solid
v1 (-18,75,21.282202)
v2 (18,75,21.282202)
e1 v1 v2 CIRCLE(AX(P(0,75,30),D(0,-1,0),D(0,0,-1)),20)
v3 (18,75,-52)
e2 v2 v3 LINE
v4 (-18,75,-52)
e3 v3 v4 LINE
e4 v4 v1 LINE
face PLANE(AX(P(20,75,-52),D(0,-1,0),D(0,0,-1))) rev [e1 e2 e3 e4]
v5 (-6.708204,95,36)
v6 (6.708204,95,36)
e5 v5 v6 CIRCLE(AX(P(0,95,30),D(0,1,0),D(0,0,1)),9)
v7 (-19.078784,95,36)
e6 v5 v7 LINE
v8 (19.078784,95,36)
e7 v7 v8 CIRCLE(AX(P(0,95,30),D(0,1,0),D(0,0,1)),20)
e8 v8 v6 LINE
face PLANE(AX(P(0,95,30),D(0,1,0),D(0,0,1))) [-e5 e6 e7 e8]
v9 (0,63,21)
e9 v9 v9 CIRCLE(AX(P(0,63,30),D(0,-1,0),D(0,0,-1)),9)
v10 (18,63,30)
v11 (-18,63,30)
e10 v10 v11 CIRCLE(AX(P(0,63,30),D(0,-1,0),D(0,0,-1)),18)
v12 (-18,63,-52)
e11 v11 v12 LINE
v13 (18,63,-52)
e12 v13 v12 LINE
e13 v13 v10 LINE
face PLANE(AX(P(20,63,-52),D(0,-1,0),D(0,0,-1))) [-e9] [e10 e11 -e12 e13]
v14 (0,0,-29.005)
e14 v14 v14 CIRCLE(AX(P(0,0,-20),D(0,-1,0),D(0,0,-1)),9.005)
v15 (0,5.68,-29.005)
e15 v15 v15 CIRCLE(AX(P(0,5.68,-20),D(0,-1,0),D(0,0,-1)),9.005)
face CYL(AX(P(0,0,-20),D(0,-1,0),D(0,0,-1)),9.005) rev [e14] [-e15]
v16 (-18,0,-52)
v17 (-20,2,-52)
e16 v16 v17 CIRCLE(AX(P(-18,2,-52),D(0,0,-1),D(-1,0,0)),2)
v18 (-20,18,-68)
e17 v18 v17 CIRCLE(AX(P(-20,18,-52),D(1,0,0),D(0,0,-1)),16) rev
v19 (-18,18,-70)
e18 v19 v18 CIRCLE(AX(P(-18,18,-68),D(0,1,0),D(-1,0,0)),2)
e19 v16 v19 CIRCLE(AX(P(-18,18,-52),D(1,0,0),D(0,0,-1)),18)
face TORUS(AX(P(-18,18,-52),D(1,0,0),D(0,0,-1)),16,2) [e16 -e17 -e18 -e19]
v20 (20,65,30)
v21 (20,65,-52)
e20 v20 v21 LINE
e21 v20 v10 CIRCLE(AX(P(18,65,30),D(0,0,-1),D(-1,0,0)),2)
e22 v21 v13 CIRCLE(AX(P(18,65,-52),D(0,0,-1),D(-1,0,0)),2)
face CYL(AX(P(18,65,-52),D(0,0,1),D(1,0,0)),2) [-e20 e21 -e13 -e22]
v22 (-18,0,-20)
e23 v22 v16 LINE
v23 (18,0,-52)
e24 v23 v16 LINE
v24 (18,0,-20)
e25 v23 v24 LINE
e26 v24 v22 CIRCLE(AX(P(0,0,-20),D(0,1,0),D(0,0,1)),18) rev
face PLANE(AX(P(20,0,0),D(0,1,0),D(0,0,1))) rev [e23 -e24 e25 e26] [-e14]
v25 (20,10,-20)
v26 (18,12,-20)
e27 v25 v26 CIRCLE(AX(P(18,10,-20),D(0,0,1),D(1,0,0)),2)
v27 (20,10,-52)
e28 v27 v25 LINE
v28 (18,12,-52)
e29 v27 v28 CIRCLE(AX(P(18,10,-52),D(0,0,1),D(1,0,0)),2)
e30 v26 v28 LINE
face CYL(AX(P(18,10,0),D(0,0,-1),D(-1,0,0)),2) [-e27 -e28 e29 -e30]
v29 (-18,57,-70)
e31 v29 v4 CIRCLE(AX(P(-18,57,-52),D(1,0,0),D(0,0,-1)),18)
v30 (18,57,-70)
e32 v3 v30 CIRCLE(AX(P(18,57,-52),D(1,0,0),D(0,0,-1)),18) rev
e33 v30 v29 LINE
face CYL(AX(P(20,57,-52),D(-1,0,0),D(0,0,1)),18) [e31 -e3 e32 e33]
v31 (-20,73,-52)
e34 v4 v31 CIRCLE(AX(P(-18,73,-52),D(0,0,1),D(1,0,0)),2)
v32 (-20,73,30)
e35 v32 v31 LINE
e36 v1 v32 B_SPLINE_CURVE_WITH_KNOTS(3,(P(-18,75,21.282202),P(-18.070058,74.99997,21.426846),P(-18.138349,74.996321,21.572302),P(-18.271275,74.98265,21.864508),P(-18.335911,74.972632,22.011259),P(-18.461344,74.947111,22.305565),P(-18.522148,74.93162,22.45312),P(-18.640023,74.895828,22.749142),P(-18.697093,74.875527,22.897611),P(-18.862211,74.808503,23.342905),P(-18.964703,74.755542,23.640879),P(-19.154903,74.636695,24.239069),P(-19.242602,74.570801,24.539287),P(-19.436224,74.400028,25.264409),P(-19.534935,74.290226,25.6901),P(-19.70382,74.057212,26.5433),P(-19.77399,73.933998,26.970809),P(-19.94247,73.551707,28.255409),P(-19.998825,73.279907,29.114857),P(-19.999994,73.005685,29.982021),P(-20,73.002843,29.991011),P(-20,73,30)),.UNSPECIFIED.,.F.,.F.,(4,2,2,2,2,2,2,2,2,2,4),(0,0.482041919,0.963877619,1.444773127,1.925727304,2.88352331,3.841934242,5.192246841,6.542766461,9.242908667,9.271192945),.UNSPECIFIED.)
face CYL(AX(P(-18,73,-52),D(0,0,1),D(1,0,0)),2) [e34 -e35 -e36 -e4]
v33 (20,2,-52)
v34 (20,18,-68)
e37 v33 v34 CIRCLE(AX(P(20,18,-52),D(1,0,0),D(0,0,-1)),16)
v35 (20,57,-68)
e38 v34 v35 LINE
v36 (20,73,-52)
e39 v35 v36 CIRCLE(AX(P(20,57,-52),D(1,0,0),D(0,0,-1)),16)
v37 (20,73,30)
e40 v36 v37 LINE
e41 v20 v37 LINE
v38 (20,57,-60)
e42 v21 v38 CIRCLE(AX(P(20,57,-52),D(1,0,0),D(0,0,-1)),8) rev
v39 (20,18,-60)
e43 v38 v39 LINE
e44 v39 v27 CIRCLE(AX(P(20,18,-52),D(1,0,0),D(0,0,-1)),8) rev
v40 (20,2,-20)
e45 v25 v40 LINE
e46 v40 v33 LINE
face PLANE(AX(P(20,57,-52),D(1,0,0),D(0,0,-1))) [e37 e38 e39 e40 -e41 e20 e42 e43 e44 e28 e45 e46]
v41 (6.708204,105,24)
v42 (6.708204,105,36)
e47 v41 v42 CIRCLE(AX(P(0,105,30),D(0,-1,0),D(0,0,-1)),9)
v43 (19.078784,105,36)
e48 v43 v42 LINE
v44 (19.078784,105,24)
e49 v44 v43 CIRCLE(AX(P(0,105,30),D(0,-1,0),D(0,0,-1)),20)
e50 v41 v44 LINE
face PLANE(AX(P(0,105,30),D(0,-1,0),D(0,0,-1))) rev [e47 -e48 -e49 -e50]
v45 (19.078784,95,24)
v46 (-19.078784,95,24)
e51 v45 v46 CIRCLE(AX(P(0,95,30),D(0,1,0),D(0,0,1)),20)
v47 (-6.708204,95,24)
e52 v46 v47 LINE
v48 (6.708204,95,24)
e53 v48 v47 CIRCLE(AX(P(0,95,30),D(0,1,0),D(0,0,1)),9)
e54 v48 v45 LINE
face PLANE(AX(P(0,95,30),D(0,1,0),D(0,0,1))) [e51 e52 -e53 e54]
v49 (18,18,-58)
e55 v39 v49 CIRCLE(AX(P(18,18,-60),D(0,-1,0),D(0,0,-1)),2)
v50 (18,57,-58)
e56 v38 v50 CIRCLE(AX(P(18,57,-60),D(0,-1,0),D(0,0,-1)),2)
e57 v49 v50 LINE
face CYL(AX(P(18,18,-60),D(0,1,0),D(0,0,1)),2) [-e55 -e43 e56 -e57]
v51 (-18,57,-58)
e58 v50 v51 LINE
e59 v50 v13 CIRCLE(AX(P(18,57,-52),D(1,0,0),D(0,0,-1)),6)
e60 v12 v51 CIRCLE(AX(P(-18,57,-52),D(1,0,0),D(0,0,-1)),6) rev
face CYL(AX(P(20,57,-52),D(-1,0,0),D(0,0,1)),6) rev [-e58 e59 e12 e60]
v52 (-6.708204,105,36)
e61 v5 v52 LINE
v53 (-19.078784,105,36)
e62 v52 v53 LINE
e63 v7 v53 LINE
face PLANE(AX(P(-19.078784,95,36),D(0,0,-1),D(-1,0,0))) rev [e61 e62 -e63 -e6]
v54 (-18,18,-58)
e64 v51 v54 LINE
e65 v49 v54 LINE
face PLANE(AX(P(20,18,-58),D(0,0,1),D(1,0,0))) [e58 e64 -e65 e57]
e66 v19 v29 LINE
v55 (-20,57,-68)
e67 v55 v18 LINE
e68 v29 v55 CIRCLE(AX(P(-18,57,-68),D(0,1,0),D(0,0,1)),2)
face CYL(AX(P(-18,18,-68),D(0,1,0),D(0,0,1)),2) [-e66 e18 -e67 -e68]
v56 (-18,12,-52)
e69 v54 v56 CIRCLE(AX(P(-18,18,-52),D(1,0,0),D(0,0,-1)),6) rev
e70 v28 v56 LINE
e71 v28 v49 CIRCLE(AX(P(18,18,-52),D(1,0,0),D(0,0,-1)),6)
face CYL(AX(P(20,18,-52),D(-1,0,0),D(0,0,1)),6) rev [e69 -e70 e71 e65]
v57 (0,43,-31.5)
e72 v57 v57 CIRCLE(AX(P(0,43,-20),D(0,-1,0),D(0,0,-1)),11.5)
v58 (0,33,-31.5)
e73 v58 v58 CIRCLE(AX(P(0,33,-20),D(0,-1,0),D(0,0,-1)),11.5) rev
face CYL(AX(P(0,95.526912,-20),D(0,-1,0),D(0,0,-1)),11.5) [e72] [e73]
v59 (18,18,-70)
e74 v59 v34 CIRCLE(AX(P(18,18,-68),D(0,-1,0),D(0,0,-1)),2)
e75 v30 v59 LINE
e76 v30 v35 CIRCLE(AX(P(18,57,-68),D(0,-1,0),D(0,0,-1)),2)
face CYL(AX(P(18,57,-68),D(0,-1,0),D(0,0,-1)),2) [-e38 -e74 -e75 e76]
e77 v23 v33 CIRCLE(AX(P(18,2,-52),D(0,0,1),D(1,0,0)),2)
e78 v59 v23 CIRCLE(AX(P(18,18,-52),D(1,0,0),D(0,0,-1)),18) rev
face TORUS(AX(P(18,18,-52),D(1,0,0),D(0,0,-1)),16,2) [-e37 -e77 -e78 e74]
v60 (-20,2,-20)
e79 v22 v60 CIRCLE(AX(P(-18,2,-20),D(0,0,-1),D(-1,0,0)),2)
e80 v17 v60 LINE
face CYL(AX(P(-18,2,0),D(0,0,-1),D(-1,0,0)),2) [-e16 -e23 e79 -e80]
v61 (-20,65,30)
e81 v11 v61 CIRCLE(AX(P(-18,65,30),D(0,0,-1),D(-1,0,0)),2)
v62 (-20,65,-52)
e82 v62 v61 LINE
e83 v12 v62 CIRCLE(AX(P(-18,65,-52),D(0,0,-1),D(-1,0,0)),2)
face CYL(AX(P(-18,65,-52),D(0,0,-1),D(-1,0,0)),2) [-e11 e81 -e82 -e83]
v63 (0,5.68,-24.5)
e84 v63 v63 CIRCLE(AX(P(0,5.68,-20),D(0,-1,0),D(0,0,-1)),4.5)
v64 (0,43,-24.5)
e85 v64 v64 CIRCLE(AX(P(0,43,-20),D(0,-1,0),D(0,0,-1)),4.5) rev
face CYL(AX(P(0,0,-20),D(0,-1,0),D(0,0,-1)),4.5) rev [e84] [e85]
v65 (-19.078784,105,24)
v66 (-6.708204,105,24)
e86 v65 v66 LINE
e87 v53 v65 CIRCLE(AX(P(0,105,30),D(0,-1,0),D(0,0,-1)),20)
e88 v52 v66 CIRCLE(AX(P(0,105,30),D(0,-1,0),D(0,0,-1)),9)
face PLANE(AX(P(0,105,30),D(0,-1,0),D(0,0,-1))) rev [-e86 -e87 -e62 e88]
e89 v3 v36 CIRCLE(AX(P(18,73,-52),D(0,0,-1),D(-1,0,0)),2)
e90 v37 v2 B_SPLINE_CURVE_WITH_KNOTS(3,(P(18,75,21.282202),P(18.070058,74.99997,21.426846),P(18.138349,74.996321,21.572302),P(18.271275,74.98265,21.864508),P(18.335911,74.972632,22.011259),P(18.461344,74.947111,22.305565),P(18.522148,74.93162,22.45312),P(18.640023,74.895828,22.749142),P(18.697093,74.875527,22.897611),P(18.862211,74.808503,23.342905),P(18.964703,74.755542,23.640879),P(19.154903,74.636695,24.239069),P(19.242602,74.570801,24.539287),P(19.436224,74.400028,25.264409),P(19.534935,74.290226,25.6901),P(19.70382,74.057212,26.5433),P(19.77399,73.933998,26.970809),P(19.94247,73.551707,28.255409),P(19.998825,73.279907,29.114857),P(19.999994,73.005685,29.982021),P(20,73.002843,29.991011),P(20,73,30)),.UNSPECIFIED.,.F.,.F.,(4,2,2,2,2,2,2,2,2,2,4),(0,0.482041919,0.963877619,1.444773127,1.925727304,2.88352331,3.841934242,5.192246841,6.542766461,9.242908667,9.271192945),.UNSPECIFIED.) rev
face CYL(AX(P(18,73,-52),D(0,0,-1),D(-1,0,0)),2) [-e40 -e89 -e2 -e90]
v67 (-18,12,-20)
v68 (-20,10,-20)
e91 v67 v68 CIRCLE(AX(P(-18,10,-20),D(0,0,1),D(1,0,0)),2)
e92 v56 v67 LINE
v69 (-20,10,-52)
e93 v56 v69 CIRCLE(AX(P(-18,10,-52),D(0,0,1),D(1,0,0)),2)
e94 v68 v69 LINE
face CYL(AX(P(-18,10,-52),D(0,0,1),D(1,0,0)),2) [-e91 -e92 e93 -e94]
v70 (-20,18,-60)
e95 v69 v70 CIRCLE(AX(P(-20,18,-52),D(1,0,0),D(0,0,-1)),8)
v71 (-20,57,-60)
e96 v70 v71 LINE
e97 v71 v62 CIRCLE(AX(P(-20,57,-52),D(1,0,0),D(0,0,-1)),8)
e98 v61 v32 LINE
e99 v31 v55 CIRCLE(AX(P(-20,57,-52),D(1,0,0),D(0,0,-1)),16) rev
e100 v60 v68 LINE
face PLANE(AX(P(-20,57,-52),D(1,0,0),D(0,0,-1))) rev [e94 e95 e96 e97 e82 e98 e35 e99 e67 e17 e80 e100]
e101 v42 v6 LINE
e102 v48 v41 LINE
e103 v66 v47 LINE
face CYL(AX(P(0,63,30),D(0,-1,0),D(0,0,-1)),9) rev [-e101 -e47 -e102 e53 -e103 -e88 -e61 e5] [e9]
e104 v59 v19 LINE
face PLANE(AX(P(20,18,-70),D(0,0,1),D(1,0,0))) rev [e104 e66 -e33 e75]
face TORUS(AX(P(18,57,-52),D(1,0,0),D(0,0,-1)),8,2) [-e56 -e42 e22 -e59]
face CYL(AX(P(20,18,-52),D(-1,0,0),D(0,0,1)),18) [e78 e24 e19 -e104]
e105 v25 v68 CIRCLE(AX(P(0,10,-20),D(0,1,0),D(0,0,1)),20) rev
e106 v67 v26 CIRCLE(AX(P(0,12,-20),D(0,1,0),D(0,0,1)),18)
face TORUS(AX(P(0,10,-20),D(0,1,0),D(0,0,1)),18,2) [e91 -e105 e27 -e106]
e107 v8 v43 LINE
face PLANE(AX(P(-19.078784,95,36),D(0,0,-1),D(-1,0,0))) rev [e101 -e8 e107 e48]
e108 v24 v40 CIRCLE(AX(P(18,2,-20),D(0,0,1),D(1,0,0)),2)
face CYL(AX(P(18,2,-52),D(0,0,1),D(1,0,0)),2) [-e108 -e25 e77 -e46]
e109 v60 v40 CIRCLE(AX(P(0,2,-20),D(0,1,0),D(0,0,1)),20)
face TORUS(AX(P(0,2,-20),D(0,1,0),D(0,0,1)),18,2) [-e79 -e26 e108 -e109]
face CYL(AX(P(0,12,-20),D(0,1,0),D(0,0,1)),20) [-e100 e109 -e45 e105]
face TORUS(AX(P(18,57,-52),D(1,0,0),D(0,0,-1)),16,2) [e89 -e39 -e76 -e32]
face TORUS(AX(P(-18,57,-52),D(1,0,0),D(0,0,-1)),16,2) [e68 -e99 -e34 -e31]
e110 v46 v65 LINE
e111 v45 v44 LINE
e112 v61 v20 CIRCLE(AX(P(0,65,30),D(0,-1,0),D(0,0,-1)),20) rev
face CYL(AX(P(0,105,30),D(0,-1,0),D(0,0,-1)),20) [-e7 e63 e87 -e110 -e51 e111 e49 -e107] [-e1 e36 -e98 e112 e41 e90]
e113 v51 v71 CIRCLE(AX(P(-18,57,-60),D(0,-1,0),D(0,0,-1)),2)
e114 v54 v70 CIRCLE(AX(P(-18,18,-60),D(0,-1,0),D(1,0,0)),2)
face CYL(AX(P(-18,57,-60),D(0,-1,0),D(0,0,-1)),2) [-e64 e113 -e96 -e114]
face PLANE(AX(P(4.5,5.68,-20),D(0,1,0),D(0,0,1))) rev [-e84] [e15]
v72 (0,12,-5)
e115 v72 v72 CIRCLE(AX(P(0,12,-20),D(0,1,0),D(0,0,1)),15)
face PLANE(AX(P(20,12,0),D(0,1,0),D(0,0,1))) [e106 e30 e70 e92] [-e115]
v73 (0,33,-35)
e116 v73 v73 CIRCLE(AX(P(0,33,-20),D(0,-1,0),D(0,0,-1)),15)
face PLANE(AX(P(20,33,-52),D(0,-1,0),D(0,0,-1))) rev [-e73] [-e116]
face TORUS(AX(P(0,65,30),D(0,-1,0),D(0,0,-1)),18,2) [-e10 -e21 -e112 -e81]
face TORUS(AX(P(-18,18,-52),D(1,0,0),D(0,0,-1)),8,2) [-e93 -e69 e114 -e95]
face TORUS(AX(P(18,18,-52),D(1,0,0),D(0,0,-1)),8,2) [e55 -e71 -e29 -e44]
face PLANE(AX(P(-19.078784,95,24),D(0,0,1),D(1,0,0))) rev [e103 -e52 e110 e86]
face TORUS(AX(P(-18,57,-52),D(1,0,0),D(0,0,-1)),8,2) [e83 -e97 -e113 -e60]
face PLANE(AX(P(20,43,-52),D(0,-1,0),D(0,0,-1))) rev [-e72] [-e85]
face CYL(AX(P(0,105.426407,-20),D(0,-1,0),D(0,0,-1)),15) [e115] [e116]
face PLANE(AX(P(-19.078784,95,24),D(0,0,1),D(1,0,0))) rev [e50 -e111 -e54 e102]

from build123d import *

# Parameters (mm, degrees)
EXTRUDE_THIN1_DEPTH                       = 20
SKETCH2_R                                 = 20
BOSS_EXTRUDE1_DEPTH                       = 42
FILLET1_RADIUS                            = 20
FILLET1_LENGTH                            = 12
SKETCH3_R                                 = 15
BOSS_EXTRUDE2_DEPTH                       = 21
SKETCH4_R                                 = 11.5
BOSS_EXTRUDE3_DEPTH                       = 10
CUT_EXTRUDE1_START                        = -10
CUT_EXTRUDE1_DEPTH                        = 10
F_18_0_18_DIAMETER_HOLE1_D                = 18
CBORE_FOR_M8_HEX_HEAD_BOLT1_OUTLINE_R     = 4.5
CBORE_FOR_M8_HEX_HEAD_BOLT1_DEPTH         = 43
CBORE_FOR_M8_HEX_HEAD_BOLT1_2_OUTLINE_R   = 9.005
CBORE_FOR_M8_HEX_HEAD_BOLT1_2_OUTLINE_R_2 = 4.5
CBORE_FOR_M8_HEX_HEAD_BOLT1_2_DEPTH       = 5.68
FILLET2_R                                 = 2


# Read off the part's stored shape, not the designer's step: CBORE for M8 Hex Head Bolt1
with BuildPart() as part:
    # Sketch1 → Extrude-Thin1 (new, symmetric)
    with BuildSketch(Plane(origin=(0, 0, 0), x_dir=(0, 0, -1), z_dir=(1, 0, 0))):
        with BuildLine():
            Line((0, 0), (52, 0))
            ThreePointArc((52, 0), (64.727922061, 5.272077939), (70, 18))
            Line((70, 18), (70, 57))
            ThreePointArc((70, 57), (64.727922061, 69.727922061), (52, 75))
            Line((52, 75), (-30, 75))
            Line((-30, 75), (-30, 63))
            Line((-30, 63), (52, 63))
            ThreePointArc((52, 63), (56.242640687, 61.242640687), (58, 57))
            Line((58, 57), (58, 18))
            ThreePointArc((58, 18), (56.242640687, 13.757359313), (52, 12))
            Line((52, 12), (0, 12))
            Line((0, 12), (0, 0))
        make_face()
    extrude(amount=EXTRUDE_THIN1_DEPTH, both=True)

    # Sketch2 → Boss-Extrude1 (add)
    with BuildSketch(Plane.XZ.offset(-63)):
        with Locations(Location((0, 30, 0), (0, 0, 270))):
            Circle(SKETCH2_R)
    extrude(amount=-BOSS_EXTRUDE1_DEPTH)

    # Fillet1: full round fillet: the end face becomes a half cylinder, R = half its width
    fillet1_face = Plane((0, 6, 0), x_dir=(0, -1, 0), z_dir=(0, 0, 1))  # on the end face: x along it, z out of the body
    fillet1_slab = fillet1_face.offset(-FILLET1_RADIUS / 2) * Box(FILLET1_LENGTH, 2 * FILLET1_RADIUS, FILLET1_RADIUS, mode=Mode.PRIVATE)  # the body's end, R deep
    fillet1_round = Plane((0, 6, -20), x_dir=(0, 0, 1), z_dir=(0, -1, 0)) * Cylinder(FILLET1_RADIUS, FILLET1_LENGTH, mode=Mode.PRIVATE)  # its axis R under the face
    add(fillet1_slab - fillet1_round, mode=Mode.SUBTRACT)

    # Sketch3 → Boss-Extrude2 (add)
    with BuildSketch(Plane(origin=(0, 12, 0), x_dir=(1, 0, 0), z_dir=(0, 1, 0))):
        with Locations(Location((0, 20, 0), (0, 0, 90))):
            Circle(SKETCH3_R)
    extrude(amount=BOSS_EXTRUDE2_DEPTH)

    # Sketch4 → Boss-Extrude3 (add)
    with BuildSketch(Plane(origin=(0, 33, 0), x_dir=(1, 0, 0), z_dir=(0, 1, 0))):
        with Locations(Location((0, 20, 0), (0, 0, 90))):
            Circle(SKETCH4_R)
    extrude(amount=BOSS_EXTRUDE3_DEPTH)

    # Sketch5 → Cut-Extrude1 (cut)
    with BuildSketch(Plane(origin=(0, 105, 0), x_dir=(1, 0, 0), z_dir=(0, 1, 0)).offset(CUT_EXTRUDE1_START)):
        with BuildLine():
            Line((-19.078784028, -24), (19.078784028, -24))
            ThreePointArc((19.078784028, -24), (0, -10), (-19.078784028, -24))
        make_face()
        with BuildLine():
            Line((-19.078784028, -36), (19.078784028, -36))
            ThreePointArc((19.078784028, -36), (0, -50), (-19.078784028, -36))
        make_face()
    extrude(amount=CUT_EXTRUDE1_DEPTH, mode=Mode.SUBTRACT)

    # Ø18.0 (18) Diameter Hole1 (through all)
    with Locations(Plane(origin=(0, 63, 0), x_dir=(-1, 0, 0), z_dir=(0, -1, 0))):
        with Locations((0, -30)):
            Hole(F_18_0_18_DIAMETER_HOLE1_D / 2)

    # CBORE for M8 Hex Head Bolt1 outline → CBORE for M8 Hex Head Bolt1 (cut)
    with BuildSketch(Plane(origin=(0, 0, 0), x_dir=(1, 0, 0), z_dir=(0, 1, 0))):
        with Locations((0, 20)):
            Circle(CBORE_FOR_M8_HEX_HEAD_BOLT1_OUTLINE_R)
    extrude(amount=CBORE_FOR_M8_HEX_HEAD_BOLT1_DEPTH, mode=Mode.SUBTRACT)

    # CBORE for M8 Hex Head Bolt1 2 outline → CBORE for M8 Hex Head Bolt1 2 (cut)
    with BuildSketch(Plane(origin=(0, 0, 0), x_dir=(1, 0, 0), z_dir=(0, 1, 0))):
        with Locations((0, 20)):
            Circle(CBORE_FOR_M8_HEX_HEAD_BOLT1_2_OUTLINE_R)
        with Locations((0, 20)):
            Circle(CBORE_FOR_M8_HEX_HEAD_BOLT1_2_OUTLINE_R_2, mode=Mode.SUBTRACT)
    extrude(amount=CBORE_FOR_M8_HEX_HEAD_BOLT1_2_DEPTH, mode=Mode.SUBTRACT)

    # Fillet2
    # the kernel refuses this fillet: 2 mm, written as the material it takes off along each edge
    with BuildSketch(Plane(origin=(20, 63, 30), x_dir=(0, 1, 0), z_dir=(0, 0, -1))) as fillet2_piece_1:
        with BuildLine():
            CenterArc((FILLET2_R, -FILLET2_R), FILLET2_R, 90, 90)
            Line((0, -FILLET2_R), (0, 0))
            Line((0, 0), (FILLET2_R, 0))
        make_face()
    extrude(amount=82, mode=Mode.SUBTRACT)
    with BuildSketch(Plane(origin=(-20, 18, -52), x_dir=(0, 0, -1), z_dir=(0, 1, 0))) as fillet2_piece_2:
        with BuildLine():
            CenterArc((6 + FILLET2_R, -FILLET2_R), FILLET2_R, 90, 90)
            Line((6 + FILLET2_R, 0), (6, 0))
            Line((6, 0), (6, -FILLET2_R))
        make_face()
    revolve(axis=Axis((-20, 18, -52), (-1, 0, 0)), revolution_arc=90, mode=Mode.SUBTRACT)
    with BuildSketch(Plane(origin=(-20, 57, -58), x_dir=(0, 0, -1), z_dir=(0, -1, 0)), Plane(origin=(-20, 18, -70), x_dir=(0, 0, 1), z_dir=(0, 1, 0))) as fillet2_piece_3:
        with BuildLine():
            CenterArc((FILLET2_R, FILLET2_R), FILLET2_R, 180, 90)
            Line((0, FILLET2_R), (0, 0))
            Line((0, 0), (FILLET2_R, 0))
        make_face()
    extrude(amount=39, mode=Mode.SUBTRACT)
    with BuildSketch(Plane(origin=(-20, 57, -52), x_dir=(0, 1, 0), z_dir=(0, 0, 1))) as fillet2_piece_4:
        with BuildLine():
            CenterArc((6 + FILLET2_R, -FILLET2_R), FILLET2_R, 90, 90)
            Line((6, -FILLET2_R), (6, 0))
            Line((6, 0), (6 + FILLET2_R, 0))
        make_face()
    revolve(axis=Axis((-20, 57, -52), (-1, 0, 0)), revolution_arc=90, mode=Mode.SUBTRACT)
    with BuildSketch(Plane(origin=(-20, 63, 30), x_dir=(0, 1, 0), z_dir=(0, 0, -1))) as fillet2_piece_5:
        with BuildLine():
            CenterArc((FILLET2_R, FILLET2_R), FILLET2_R, 180, 90)
            Line((0, FILLET2_R), (0, 0))
            Line((0, 0), (FILLET2_R, 0))
        make_face()
    extrude(amount=82, mode=Mode.SUBTRACT)
    with BuildSketch(Plane(origin=(-20, 75, -52), x_dir=(0, -1, 0), z_dir=(0, 0, 1))) as fillet2_piece_6_section:
        with BuildLine():
            CenterArc((FILLET2_R, FILLET2_R), FILLET2_R, 180, 90)
            Line((0, FILLET2_R), (0, 0))
            Line((0, 0), (FILLET2_R, 0))
        make_face()
    fillet2_piece_6 = extrude(amount=87, mode=Mode.PRIVATE)
    fillet2_piece_6 = fillet2_piece_6 - Plane(origin=(0, 74.534164155, 30), x_dir=(0, 0, -1), z_dir=(0, -1, 0)) * Cylinder(20, 182, mode=Mode.PRIVATE)
    add(fillet2_piece_6, mode=Mode.SUBTRACT)
    with BuildSketch(Plane(origin=(20, 57, -52), x_dir=(0, 1, 0), z_dir=(0, 0, 1))) as fillet2_piece_7:
        with BuildLine():
            CenterArc((6 + FILLET2_R, FILLET2_R), FILLET2_R, 180, 90)
            Line((6, FILLET2_R), (6, 0))
            Line((6, 0), (6 + FILLET2_R, 0))
        make_face()
    revolve(axis=Axis((20, 57, -52), (-1, 0, 0)), revolution_arc=90, mode=Mode.SUBTRACT)
    with BuildSketch(Plane(origin=(20, 57, -58), x_dir=(0, 0, -1), z_dir=(0, -1, 0)), Plane(origin=(20, 18, -70), x_dir=(0, 0, 1), z_dir=(0, 1, 0))) as fillet2_piece_8:
        with BuildLine():
            CenterArc((FILLET2_R, -FILLET2_R), FILLET2_R, 90, 90)
            Line((0, -FILLET2_R), (0, 0))
            Line((0, 0), (FILLET2_R, 0))
        make_face()
    extrude(amount=39, mode=Mode.SUBTRACT)
    with BuildSketch(Plane(origin=(20, 18, -52), x_dir=(0, 0, -1), z_dir=(0, 1, 0))) as fillet2_piece_9:
        with BuildLine():
            CenterArc((6 + FILLET2_R, FILLET2_R), FILLET2_R, 180, 90)
            Line((6 + FILLET2_R, 0), (6, 0))
            Line((6, 0), (6, FILLET2_R))
        make_face()
    revolve(axis=Axis((20, 18, -52), (-1, 0, 0)), revolution_arc=90, mode=Mode.SUBTRACT)
    with BuildSketch(Plane(origin=(20, 18, -52), x_dir=(0, -1, 0), z_dir=(0, 0, 1))) as fillet2_piece_10:
        with BuildLine():
            CenterArc((18 - FILLET2_R, -FILLET2_R), FILLET2_R, 0, 90)
            Line((18, -FILLET2_R), (18, 0))
            Line((18, 0), (18 - FILLET2_R, 0))
        make_face()
    revolve(axis=Axis((20, 18, -52), (1, 0, 0)), revolution_arc=90, mode=Mode.SUBTRACT)
    with BuildSketch(Plane(origin=(0, 63, 30), x_dir=(1, 0, 0), z_dir=(0, 0, -1))) as fillet2_piece_11:
        with BuildLine():
            CenterArc((20 - FILLET2_R, -FILLET2_R), FILLET2_R, 0, 90)
            Line((20, -FILLET2_R), (20, 0))
            Line((20, 0), (20 - FILLET2_R, 0))
        make_face()
    revolve(axis=Axis((0, 63, 30), (0, -1, 0)), revolution_arc=180, mode=Mode.SUBTRACT)
    with BuildSketch(Plane(origin=(20, 57, -52), x_dir=(0, 0, -1), z_dir=(0, -1, 0))) as fillet2_piece_12:
        with BuildLine():
            CenterArc((18 - FILLET2_R, -FILLET2_R), FILLET2_R, 0, 90)
            Line((18, -FILLET2_R), (18, 0))
            Line((18, 0), (18 - FILLET2_R, 0))
        make_face()
    revolve(axis=Axis((20, 57, -52), (1, 0, 0)), revolution_arc=90, mode=Mode.SUBTRACT)
    with BuildSketch(Plane(origin=(20, 12, -52), x_dir=(-1, 0, 0), z_dir=(0, 0, 1)), Plane(origin=(-20, 0, -20), x_dir=(0, 1, 0), z_dir=(0, 0, -1))) as fillet2_piece_13:
        with BuildLine():
            CenterArc((FILLET2_R, FILLET2_R), FILLET2_R, 180, 90)
            Line((0, FILLET2_R), (0, 0))
            Line((0, 0), (FILLET2_R, 0))
        make_face()
    extrude(amount=32, mode=Mode.SUBTRACT)
    with BuildSketch(Plane(origin=(20, 0, -20), x_dir=(0, 1, 0), z_dir=(0, 0, -1)), Plane(origin=(-20, 12, -52), x_dir=(1, 0, 0), z_dir=(0, 0, 1))) as fillet2_piece_14:
        with BuildLine():
            CenterArc((FILLET2_R, -FILLET2_R), FILLET2_R, 90, 90)
            Line((0, -FILLET2_R), (0, 0))
            Line((0, 0), (FILLET2_R, 0))
        make_face()
    extrude(amount=32, mode=Mode.SUBTRACT)
    with BuildSketch(Plane(origin=(20, 75, -52), x_dir=(0, -1, 0), z_dir=(0, 0, 1))) as fillet2_piece_15_section:
        with BuildLine():
            CenterArc((FILLET2_R, -FILLET2_R), FILLET2_R, 90, 90)
            Line((0, -FILLET2_R), (0, 0))
            Line((0, 0), (FILLET2_R, 0))
        make_face()
    fillet2_piece_15 = extrude(amount=87, mode=Mode.PRIVATE)
    fillet2_piece_15 = fillet2_piece_15 - Plane(origin=(0, 74.534164154, 30), x_dir=(0, 0, -1), z_dir=(0, -1, 0)) * Cylinder(20, 182, mode=Mode.PRIVATE)
    add(fillet2_piece_15, mode=Mode.SUBTRACT)
    with BuildSketch(Plane(origin=(0, 12, -20), x_dir=(-1, 0, 0), z_dir=(0, 0, -1))) as fillet2_piece_16:
        with BuildLine():
            CenterArc((20 - FILLET2_R, -FILLET2_R), FILLET2_R, 0, 90)
            Line((20, -FILLET2_R), (20, 0))
            Line((20, 0), (20 - FILLET2_R, 0))
        make_face()
    revolve(axis=Axis((0, 12, -20), (0, 1, 0)), revolution_arc=180, mode=Mode.SUBTRACT)
    with BuildSketch(Plane(origin=(0, 0, -20), x_dir=(-1, 0, 0), z_dir=(0, 0, -1))) as fillet2_piece_17:
        with BuildLine():
            CenterArc((20 - FILLET2_R, FILLET2_R), FILLET2_R, 270, 90)
            Line((20 - FILLET2_R, 0), (20, 0))
            Line((20, 0), (20, FILLET2_R))
        make_face()
    revolve(axis=Axis((0, 0, -20), (0, 1, 0)), revolution_arc=180, mode=Mode.SUBTRACT)
    with BuildSketch(Plane(origin=(-20, 57, -52), x_dir=(0, 0, -1), z_dir=(0, -1, 0))) as fillet2_piece_18:
        with BuildLine():
            CenterArc((18 - FILLET2_R, FILLET2_R), FILLET2_R, 270, 90)
            Line((18, FILLET2_R), (18, 0))
            Line((18, 0), (18 - FILLET2_R, 0))
        make_face()
    revolve(axis=Axis((-20, 57, -52), (1, 0, 0)), revolution_arc=90, mode=Mode.SUBTRACT)
    with BuildSketch(Plane(origin=(-20, 18, -52), x_dir=(0, -1, 0), z_dir=(0, 0, 1))) as fillet2_piece_19:
        with BuildLine():
            CenterArc((18 - FILLET2_R, FILLET2_R), FILLET2_R, 270, 90)
            Line((18, FILLET2_R), (18, 0))
            Line((18, 0), (18 - FILLET2_R, 0))
        make_face()
    revolve(axis=Axis((-20, 18, -52), (1, 0, 0)), revolution_arc=90, mode=Mode.SUBTRACT)


solid = part.part
